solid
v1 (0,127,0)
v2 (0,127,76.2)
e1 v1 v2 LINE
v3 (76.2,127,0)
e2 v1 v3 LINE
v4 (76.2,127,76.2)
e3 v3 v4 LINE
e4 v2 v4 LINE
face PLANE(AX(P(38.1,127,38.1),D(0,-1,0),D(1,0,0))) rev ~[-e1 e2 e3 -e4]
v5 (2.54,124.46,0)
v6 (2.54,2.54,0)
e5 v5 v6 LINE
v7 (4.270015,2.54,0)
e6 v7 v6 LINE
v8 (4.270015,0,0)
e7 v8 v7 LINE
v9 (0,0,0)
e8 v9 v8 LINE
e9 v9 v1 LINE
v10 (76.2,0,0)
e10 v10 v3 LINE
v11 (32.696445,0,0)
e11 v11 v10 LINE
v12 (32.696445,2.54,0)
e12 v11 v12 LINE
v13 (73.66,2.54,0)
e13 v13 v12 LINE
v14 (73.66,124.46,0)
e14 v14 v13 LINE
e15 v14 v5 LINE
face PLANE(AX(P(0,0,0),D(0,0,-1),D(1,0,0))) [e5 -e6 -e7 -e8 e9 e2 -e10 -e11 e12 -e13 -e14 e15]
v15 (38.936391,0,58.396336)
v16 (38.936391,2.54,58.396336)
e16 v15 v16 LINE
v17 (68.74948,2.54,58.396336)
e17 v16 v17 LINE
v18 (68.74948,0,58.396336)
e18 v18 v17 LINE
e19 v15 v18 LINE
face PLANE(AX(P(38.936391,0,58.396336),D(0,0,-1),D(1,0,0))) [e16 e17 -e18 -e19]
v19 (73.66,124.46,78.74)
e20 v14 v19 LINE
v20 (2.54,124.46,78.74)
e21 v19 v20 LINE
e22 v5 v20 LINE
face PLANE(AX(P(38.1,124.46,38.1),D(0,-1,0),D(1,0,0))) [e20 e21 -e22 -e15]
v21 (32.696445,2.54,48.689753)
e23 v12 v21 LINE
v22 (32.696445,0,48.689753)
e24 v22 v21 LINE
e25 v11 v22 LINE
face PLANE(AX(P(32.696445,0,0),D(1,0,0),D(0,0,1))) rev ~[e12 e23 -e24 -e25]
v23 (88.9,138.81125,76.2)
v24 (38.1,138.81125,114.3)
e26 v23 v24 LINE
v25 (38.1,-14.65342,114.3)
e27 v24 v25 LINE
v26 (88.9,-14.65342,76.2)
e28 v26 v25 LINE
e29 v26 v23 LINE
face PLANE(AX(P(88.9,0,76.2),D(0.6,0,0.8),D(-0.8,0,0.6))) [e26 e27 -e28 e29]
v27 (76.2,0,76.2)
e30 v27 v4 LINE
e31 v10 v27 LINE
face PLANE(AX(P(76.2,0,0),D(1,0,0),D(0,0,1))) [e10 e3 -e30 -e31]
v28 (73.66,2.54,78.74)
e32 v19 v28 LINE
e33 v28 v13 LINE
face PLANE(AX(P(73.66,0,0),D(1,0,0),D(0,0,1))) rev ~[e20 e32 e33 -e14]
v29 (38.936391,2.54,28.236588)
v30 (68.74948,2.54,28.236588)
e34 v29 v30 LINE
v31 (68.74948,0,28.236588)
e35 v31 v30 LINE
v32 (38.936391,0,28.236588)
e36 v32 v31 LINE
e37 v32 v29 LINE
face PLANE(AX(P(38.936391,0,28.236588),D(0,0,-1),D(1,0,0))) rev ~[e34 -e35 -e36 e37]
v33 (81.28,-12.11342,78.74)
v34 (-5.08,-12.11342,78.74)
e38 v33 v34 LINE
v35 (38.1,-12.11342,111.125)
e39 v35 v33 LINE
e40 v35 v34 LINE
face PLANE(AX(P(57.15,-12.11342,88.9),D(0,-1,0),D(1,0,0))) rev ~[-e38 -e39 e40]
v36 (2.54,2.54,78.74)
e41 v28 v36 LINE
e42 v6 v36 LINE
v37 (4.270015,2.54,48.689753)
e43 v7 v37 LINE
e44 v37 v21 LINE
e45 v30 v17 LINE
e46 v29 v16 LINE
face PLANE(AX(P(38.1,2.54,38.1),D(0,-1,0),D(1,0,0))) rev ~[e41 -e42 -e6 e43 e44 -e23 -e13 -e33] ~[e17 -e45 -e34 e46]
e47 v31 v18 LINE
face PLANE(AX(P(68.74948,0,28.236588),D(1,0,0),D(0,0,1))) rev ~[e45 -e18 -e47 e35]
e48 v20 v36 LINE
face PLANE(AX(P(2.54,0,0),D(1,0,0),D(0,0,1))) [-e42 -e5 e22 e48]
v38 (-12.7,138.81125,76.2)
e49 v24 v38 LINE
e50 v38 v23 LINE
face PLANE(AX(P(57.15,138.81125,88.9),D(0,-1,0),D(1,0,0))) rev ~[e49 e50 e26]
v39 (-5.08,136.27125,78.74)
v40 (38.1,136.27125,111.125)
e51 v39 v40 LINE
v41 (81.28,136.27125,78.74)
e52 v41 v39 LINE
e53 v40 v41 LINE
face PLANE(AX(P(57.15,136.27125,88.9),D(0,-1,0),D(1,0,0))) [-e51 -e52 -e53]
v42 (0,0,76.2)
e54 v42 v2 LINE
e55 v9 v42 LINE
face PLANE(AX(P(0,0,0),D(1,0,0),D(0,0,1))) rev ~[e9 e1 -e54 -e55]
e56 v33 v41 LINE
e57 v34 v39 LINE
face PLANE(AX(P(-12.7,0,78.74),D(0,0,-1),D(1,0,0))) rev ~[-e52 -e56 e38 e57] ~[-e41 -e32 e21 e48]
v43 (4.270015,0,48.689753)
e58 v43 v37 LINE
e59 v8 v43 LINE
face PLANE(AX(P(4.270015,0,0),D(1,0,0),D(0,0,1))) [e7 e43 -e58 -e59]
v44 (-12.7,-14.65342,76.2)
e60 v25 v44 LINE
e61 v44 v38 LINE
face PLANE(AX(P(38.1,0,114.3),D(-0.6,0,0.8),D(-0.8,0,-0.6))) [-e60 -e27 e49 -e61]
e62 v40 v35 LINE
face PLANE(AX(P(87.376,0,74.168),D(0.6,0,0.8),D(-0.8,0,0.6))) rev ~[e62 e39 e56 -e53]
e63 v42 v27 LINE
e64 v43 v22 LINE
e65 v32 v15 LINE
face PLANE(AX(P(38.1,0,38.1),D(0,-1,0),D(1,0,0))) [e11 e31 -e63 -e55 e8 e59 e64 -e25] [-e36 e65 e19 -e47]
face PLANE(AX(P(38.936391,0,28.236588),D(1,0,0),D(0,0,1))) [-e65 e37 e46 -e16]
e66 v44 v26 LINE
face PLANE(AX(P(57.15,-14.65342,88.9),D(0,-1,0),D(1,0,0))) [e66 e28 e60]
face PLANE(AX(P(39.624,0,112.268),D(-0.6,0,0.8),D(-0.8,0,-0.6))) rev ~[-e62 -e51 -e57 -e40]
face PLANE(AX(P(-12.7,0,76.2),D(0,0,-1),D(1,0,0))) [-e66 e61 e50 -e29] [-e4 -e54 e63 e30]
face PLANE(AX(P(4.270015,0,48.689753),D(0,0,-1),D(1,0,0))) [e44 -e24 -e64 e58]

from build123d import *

# Parameters (mm, degrees)
F0_W          = 76.2
F0_H          = 76.2
F1_DEPTH      = 127
F3_DEPTH      = 14.65342
F3_DEPTH_BACK = 138.81125
F4_T          = -2.54
F6_W          = 29.8130884767
F6_H          = 30.159747228
F6_W_2        = 28.4264292568
F6_H_2        = 48.6897528172
F7_DEPTH      = 25.4


with BuildPart() as f1:
    # F0 (on Front) → F1 (new body)
    with BuildSketch(Plane.XZ):
        with Locations((38.1, 38.1)):
            Rectangle(F0_W, F0_H)
    extrude(amount=-F1_DEPTH)

    # F2 (on Front) → F3 (join, two sides)
    with BuildSketch(Plane.XZ) as f3_sk:
        Polygon((38.1, 114.3), (38.1, 76.2), (76.2, 76.2), (88.9, 76.2), align=None)
        Polygon((-12.7, 76.2), (0, 76.2), (38.1, 76.2), (38.1, 114.3), align=None)
    extrude(amount=F3_DEPTH)
    extrude(f3_sk.sketch, amount=-F3_DEPTH_BACK)

    # F4
    f4_openings = [f1.faces().sort_by_distance(p)[0] for p in [
        (38.1, 63.5, 0),
    ]]
    offset(amount=F4_T, openings=f4_openings, kind=Kind.INTERSECTION)

    # F6 (on Front) → F7 (cut)
    with BuildSketch(Plane.XZ):
        with Locations((53.8429357111, 43.3164620772)):
            Rectangle(F6_W, F6_H)
        with Locations((18.4832299128, 24.3448764086)):
            Rectangle(F6_W_2, F6_H_2)
    extrude(amount=-F7_DEPTH, mode=Mode.SUBTRACT)


solid = f1.part
